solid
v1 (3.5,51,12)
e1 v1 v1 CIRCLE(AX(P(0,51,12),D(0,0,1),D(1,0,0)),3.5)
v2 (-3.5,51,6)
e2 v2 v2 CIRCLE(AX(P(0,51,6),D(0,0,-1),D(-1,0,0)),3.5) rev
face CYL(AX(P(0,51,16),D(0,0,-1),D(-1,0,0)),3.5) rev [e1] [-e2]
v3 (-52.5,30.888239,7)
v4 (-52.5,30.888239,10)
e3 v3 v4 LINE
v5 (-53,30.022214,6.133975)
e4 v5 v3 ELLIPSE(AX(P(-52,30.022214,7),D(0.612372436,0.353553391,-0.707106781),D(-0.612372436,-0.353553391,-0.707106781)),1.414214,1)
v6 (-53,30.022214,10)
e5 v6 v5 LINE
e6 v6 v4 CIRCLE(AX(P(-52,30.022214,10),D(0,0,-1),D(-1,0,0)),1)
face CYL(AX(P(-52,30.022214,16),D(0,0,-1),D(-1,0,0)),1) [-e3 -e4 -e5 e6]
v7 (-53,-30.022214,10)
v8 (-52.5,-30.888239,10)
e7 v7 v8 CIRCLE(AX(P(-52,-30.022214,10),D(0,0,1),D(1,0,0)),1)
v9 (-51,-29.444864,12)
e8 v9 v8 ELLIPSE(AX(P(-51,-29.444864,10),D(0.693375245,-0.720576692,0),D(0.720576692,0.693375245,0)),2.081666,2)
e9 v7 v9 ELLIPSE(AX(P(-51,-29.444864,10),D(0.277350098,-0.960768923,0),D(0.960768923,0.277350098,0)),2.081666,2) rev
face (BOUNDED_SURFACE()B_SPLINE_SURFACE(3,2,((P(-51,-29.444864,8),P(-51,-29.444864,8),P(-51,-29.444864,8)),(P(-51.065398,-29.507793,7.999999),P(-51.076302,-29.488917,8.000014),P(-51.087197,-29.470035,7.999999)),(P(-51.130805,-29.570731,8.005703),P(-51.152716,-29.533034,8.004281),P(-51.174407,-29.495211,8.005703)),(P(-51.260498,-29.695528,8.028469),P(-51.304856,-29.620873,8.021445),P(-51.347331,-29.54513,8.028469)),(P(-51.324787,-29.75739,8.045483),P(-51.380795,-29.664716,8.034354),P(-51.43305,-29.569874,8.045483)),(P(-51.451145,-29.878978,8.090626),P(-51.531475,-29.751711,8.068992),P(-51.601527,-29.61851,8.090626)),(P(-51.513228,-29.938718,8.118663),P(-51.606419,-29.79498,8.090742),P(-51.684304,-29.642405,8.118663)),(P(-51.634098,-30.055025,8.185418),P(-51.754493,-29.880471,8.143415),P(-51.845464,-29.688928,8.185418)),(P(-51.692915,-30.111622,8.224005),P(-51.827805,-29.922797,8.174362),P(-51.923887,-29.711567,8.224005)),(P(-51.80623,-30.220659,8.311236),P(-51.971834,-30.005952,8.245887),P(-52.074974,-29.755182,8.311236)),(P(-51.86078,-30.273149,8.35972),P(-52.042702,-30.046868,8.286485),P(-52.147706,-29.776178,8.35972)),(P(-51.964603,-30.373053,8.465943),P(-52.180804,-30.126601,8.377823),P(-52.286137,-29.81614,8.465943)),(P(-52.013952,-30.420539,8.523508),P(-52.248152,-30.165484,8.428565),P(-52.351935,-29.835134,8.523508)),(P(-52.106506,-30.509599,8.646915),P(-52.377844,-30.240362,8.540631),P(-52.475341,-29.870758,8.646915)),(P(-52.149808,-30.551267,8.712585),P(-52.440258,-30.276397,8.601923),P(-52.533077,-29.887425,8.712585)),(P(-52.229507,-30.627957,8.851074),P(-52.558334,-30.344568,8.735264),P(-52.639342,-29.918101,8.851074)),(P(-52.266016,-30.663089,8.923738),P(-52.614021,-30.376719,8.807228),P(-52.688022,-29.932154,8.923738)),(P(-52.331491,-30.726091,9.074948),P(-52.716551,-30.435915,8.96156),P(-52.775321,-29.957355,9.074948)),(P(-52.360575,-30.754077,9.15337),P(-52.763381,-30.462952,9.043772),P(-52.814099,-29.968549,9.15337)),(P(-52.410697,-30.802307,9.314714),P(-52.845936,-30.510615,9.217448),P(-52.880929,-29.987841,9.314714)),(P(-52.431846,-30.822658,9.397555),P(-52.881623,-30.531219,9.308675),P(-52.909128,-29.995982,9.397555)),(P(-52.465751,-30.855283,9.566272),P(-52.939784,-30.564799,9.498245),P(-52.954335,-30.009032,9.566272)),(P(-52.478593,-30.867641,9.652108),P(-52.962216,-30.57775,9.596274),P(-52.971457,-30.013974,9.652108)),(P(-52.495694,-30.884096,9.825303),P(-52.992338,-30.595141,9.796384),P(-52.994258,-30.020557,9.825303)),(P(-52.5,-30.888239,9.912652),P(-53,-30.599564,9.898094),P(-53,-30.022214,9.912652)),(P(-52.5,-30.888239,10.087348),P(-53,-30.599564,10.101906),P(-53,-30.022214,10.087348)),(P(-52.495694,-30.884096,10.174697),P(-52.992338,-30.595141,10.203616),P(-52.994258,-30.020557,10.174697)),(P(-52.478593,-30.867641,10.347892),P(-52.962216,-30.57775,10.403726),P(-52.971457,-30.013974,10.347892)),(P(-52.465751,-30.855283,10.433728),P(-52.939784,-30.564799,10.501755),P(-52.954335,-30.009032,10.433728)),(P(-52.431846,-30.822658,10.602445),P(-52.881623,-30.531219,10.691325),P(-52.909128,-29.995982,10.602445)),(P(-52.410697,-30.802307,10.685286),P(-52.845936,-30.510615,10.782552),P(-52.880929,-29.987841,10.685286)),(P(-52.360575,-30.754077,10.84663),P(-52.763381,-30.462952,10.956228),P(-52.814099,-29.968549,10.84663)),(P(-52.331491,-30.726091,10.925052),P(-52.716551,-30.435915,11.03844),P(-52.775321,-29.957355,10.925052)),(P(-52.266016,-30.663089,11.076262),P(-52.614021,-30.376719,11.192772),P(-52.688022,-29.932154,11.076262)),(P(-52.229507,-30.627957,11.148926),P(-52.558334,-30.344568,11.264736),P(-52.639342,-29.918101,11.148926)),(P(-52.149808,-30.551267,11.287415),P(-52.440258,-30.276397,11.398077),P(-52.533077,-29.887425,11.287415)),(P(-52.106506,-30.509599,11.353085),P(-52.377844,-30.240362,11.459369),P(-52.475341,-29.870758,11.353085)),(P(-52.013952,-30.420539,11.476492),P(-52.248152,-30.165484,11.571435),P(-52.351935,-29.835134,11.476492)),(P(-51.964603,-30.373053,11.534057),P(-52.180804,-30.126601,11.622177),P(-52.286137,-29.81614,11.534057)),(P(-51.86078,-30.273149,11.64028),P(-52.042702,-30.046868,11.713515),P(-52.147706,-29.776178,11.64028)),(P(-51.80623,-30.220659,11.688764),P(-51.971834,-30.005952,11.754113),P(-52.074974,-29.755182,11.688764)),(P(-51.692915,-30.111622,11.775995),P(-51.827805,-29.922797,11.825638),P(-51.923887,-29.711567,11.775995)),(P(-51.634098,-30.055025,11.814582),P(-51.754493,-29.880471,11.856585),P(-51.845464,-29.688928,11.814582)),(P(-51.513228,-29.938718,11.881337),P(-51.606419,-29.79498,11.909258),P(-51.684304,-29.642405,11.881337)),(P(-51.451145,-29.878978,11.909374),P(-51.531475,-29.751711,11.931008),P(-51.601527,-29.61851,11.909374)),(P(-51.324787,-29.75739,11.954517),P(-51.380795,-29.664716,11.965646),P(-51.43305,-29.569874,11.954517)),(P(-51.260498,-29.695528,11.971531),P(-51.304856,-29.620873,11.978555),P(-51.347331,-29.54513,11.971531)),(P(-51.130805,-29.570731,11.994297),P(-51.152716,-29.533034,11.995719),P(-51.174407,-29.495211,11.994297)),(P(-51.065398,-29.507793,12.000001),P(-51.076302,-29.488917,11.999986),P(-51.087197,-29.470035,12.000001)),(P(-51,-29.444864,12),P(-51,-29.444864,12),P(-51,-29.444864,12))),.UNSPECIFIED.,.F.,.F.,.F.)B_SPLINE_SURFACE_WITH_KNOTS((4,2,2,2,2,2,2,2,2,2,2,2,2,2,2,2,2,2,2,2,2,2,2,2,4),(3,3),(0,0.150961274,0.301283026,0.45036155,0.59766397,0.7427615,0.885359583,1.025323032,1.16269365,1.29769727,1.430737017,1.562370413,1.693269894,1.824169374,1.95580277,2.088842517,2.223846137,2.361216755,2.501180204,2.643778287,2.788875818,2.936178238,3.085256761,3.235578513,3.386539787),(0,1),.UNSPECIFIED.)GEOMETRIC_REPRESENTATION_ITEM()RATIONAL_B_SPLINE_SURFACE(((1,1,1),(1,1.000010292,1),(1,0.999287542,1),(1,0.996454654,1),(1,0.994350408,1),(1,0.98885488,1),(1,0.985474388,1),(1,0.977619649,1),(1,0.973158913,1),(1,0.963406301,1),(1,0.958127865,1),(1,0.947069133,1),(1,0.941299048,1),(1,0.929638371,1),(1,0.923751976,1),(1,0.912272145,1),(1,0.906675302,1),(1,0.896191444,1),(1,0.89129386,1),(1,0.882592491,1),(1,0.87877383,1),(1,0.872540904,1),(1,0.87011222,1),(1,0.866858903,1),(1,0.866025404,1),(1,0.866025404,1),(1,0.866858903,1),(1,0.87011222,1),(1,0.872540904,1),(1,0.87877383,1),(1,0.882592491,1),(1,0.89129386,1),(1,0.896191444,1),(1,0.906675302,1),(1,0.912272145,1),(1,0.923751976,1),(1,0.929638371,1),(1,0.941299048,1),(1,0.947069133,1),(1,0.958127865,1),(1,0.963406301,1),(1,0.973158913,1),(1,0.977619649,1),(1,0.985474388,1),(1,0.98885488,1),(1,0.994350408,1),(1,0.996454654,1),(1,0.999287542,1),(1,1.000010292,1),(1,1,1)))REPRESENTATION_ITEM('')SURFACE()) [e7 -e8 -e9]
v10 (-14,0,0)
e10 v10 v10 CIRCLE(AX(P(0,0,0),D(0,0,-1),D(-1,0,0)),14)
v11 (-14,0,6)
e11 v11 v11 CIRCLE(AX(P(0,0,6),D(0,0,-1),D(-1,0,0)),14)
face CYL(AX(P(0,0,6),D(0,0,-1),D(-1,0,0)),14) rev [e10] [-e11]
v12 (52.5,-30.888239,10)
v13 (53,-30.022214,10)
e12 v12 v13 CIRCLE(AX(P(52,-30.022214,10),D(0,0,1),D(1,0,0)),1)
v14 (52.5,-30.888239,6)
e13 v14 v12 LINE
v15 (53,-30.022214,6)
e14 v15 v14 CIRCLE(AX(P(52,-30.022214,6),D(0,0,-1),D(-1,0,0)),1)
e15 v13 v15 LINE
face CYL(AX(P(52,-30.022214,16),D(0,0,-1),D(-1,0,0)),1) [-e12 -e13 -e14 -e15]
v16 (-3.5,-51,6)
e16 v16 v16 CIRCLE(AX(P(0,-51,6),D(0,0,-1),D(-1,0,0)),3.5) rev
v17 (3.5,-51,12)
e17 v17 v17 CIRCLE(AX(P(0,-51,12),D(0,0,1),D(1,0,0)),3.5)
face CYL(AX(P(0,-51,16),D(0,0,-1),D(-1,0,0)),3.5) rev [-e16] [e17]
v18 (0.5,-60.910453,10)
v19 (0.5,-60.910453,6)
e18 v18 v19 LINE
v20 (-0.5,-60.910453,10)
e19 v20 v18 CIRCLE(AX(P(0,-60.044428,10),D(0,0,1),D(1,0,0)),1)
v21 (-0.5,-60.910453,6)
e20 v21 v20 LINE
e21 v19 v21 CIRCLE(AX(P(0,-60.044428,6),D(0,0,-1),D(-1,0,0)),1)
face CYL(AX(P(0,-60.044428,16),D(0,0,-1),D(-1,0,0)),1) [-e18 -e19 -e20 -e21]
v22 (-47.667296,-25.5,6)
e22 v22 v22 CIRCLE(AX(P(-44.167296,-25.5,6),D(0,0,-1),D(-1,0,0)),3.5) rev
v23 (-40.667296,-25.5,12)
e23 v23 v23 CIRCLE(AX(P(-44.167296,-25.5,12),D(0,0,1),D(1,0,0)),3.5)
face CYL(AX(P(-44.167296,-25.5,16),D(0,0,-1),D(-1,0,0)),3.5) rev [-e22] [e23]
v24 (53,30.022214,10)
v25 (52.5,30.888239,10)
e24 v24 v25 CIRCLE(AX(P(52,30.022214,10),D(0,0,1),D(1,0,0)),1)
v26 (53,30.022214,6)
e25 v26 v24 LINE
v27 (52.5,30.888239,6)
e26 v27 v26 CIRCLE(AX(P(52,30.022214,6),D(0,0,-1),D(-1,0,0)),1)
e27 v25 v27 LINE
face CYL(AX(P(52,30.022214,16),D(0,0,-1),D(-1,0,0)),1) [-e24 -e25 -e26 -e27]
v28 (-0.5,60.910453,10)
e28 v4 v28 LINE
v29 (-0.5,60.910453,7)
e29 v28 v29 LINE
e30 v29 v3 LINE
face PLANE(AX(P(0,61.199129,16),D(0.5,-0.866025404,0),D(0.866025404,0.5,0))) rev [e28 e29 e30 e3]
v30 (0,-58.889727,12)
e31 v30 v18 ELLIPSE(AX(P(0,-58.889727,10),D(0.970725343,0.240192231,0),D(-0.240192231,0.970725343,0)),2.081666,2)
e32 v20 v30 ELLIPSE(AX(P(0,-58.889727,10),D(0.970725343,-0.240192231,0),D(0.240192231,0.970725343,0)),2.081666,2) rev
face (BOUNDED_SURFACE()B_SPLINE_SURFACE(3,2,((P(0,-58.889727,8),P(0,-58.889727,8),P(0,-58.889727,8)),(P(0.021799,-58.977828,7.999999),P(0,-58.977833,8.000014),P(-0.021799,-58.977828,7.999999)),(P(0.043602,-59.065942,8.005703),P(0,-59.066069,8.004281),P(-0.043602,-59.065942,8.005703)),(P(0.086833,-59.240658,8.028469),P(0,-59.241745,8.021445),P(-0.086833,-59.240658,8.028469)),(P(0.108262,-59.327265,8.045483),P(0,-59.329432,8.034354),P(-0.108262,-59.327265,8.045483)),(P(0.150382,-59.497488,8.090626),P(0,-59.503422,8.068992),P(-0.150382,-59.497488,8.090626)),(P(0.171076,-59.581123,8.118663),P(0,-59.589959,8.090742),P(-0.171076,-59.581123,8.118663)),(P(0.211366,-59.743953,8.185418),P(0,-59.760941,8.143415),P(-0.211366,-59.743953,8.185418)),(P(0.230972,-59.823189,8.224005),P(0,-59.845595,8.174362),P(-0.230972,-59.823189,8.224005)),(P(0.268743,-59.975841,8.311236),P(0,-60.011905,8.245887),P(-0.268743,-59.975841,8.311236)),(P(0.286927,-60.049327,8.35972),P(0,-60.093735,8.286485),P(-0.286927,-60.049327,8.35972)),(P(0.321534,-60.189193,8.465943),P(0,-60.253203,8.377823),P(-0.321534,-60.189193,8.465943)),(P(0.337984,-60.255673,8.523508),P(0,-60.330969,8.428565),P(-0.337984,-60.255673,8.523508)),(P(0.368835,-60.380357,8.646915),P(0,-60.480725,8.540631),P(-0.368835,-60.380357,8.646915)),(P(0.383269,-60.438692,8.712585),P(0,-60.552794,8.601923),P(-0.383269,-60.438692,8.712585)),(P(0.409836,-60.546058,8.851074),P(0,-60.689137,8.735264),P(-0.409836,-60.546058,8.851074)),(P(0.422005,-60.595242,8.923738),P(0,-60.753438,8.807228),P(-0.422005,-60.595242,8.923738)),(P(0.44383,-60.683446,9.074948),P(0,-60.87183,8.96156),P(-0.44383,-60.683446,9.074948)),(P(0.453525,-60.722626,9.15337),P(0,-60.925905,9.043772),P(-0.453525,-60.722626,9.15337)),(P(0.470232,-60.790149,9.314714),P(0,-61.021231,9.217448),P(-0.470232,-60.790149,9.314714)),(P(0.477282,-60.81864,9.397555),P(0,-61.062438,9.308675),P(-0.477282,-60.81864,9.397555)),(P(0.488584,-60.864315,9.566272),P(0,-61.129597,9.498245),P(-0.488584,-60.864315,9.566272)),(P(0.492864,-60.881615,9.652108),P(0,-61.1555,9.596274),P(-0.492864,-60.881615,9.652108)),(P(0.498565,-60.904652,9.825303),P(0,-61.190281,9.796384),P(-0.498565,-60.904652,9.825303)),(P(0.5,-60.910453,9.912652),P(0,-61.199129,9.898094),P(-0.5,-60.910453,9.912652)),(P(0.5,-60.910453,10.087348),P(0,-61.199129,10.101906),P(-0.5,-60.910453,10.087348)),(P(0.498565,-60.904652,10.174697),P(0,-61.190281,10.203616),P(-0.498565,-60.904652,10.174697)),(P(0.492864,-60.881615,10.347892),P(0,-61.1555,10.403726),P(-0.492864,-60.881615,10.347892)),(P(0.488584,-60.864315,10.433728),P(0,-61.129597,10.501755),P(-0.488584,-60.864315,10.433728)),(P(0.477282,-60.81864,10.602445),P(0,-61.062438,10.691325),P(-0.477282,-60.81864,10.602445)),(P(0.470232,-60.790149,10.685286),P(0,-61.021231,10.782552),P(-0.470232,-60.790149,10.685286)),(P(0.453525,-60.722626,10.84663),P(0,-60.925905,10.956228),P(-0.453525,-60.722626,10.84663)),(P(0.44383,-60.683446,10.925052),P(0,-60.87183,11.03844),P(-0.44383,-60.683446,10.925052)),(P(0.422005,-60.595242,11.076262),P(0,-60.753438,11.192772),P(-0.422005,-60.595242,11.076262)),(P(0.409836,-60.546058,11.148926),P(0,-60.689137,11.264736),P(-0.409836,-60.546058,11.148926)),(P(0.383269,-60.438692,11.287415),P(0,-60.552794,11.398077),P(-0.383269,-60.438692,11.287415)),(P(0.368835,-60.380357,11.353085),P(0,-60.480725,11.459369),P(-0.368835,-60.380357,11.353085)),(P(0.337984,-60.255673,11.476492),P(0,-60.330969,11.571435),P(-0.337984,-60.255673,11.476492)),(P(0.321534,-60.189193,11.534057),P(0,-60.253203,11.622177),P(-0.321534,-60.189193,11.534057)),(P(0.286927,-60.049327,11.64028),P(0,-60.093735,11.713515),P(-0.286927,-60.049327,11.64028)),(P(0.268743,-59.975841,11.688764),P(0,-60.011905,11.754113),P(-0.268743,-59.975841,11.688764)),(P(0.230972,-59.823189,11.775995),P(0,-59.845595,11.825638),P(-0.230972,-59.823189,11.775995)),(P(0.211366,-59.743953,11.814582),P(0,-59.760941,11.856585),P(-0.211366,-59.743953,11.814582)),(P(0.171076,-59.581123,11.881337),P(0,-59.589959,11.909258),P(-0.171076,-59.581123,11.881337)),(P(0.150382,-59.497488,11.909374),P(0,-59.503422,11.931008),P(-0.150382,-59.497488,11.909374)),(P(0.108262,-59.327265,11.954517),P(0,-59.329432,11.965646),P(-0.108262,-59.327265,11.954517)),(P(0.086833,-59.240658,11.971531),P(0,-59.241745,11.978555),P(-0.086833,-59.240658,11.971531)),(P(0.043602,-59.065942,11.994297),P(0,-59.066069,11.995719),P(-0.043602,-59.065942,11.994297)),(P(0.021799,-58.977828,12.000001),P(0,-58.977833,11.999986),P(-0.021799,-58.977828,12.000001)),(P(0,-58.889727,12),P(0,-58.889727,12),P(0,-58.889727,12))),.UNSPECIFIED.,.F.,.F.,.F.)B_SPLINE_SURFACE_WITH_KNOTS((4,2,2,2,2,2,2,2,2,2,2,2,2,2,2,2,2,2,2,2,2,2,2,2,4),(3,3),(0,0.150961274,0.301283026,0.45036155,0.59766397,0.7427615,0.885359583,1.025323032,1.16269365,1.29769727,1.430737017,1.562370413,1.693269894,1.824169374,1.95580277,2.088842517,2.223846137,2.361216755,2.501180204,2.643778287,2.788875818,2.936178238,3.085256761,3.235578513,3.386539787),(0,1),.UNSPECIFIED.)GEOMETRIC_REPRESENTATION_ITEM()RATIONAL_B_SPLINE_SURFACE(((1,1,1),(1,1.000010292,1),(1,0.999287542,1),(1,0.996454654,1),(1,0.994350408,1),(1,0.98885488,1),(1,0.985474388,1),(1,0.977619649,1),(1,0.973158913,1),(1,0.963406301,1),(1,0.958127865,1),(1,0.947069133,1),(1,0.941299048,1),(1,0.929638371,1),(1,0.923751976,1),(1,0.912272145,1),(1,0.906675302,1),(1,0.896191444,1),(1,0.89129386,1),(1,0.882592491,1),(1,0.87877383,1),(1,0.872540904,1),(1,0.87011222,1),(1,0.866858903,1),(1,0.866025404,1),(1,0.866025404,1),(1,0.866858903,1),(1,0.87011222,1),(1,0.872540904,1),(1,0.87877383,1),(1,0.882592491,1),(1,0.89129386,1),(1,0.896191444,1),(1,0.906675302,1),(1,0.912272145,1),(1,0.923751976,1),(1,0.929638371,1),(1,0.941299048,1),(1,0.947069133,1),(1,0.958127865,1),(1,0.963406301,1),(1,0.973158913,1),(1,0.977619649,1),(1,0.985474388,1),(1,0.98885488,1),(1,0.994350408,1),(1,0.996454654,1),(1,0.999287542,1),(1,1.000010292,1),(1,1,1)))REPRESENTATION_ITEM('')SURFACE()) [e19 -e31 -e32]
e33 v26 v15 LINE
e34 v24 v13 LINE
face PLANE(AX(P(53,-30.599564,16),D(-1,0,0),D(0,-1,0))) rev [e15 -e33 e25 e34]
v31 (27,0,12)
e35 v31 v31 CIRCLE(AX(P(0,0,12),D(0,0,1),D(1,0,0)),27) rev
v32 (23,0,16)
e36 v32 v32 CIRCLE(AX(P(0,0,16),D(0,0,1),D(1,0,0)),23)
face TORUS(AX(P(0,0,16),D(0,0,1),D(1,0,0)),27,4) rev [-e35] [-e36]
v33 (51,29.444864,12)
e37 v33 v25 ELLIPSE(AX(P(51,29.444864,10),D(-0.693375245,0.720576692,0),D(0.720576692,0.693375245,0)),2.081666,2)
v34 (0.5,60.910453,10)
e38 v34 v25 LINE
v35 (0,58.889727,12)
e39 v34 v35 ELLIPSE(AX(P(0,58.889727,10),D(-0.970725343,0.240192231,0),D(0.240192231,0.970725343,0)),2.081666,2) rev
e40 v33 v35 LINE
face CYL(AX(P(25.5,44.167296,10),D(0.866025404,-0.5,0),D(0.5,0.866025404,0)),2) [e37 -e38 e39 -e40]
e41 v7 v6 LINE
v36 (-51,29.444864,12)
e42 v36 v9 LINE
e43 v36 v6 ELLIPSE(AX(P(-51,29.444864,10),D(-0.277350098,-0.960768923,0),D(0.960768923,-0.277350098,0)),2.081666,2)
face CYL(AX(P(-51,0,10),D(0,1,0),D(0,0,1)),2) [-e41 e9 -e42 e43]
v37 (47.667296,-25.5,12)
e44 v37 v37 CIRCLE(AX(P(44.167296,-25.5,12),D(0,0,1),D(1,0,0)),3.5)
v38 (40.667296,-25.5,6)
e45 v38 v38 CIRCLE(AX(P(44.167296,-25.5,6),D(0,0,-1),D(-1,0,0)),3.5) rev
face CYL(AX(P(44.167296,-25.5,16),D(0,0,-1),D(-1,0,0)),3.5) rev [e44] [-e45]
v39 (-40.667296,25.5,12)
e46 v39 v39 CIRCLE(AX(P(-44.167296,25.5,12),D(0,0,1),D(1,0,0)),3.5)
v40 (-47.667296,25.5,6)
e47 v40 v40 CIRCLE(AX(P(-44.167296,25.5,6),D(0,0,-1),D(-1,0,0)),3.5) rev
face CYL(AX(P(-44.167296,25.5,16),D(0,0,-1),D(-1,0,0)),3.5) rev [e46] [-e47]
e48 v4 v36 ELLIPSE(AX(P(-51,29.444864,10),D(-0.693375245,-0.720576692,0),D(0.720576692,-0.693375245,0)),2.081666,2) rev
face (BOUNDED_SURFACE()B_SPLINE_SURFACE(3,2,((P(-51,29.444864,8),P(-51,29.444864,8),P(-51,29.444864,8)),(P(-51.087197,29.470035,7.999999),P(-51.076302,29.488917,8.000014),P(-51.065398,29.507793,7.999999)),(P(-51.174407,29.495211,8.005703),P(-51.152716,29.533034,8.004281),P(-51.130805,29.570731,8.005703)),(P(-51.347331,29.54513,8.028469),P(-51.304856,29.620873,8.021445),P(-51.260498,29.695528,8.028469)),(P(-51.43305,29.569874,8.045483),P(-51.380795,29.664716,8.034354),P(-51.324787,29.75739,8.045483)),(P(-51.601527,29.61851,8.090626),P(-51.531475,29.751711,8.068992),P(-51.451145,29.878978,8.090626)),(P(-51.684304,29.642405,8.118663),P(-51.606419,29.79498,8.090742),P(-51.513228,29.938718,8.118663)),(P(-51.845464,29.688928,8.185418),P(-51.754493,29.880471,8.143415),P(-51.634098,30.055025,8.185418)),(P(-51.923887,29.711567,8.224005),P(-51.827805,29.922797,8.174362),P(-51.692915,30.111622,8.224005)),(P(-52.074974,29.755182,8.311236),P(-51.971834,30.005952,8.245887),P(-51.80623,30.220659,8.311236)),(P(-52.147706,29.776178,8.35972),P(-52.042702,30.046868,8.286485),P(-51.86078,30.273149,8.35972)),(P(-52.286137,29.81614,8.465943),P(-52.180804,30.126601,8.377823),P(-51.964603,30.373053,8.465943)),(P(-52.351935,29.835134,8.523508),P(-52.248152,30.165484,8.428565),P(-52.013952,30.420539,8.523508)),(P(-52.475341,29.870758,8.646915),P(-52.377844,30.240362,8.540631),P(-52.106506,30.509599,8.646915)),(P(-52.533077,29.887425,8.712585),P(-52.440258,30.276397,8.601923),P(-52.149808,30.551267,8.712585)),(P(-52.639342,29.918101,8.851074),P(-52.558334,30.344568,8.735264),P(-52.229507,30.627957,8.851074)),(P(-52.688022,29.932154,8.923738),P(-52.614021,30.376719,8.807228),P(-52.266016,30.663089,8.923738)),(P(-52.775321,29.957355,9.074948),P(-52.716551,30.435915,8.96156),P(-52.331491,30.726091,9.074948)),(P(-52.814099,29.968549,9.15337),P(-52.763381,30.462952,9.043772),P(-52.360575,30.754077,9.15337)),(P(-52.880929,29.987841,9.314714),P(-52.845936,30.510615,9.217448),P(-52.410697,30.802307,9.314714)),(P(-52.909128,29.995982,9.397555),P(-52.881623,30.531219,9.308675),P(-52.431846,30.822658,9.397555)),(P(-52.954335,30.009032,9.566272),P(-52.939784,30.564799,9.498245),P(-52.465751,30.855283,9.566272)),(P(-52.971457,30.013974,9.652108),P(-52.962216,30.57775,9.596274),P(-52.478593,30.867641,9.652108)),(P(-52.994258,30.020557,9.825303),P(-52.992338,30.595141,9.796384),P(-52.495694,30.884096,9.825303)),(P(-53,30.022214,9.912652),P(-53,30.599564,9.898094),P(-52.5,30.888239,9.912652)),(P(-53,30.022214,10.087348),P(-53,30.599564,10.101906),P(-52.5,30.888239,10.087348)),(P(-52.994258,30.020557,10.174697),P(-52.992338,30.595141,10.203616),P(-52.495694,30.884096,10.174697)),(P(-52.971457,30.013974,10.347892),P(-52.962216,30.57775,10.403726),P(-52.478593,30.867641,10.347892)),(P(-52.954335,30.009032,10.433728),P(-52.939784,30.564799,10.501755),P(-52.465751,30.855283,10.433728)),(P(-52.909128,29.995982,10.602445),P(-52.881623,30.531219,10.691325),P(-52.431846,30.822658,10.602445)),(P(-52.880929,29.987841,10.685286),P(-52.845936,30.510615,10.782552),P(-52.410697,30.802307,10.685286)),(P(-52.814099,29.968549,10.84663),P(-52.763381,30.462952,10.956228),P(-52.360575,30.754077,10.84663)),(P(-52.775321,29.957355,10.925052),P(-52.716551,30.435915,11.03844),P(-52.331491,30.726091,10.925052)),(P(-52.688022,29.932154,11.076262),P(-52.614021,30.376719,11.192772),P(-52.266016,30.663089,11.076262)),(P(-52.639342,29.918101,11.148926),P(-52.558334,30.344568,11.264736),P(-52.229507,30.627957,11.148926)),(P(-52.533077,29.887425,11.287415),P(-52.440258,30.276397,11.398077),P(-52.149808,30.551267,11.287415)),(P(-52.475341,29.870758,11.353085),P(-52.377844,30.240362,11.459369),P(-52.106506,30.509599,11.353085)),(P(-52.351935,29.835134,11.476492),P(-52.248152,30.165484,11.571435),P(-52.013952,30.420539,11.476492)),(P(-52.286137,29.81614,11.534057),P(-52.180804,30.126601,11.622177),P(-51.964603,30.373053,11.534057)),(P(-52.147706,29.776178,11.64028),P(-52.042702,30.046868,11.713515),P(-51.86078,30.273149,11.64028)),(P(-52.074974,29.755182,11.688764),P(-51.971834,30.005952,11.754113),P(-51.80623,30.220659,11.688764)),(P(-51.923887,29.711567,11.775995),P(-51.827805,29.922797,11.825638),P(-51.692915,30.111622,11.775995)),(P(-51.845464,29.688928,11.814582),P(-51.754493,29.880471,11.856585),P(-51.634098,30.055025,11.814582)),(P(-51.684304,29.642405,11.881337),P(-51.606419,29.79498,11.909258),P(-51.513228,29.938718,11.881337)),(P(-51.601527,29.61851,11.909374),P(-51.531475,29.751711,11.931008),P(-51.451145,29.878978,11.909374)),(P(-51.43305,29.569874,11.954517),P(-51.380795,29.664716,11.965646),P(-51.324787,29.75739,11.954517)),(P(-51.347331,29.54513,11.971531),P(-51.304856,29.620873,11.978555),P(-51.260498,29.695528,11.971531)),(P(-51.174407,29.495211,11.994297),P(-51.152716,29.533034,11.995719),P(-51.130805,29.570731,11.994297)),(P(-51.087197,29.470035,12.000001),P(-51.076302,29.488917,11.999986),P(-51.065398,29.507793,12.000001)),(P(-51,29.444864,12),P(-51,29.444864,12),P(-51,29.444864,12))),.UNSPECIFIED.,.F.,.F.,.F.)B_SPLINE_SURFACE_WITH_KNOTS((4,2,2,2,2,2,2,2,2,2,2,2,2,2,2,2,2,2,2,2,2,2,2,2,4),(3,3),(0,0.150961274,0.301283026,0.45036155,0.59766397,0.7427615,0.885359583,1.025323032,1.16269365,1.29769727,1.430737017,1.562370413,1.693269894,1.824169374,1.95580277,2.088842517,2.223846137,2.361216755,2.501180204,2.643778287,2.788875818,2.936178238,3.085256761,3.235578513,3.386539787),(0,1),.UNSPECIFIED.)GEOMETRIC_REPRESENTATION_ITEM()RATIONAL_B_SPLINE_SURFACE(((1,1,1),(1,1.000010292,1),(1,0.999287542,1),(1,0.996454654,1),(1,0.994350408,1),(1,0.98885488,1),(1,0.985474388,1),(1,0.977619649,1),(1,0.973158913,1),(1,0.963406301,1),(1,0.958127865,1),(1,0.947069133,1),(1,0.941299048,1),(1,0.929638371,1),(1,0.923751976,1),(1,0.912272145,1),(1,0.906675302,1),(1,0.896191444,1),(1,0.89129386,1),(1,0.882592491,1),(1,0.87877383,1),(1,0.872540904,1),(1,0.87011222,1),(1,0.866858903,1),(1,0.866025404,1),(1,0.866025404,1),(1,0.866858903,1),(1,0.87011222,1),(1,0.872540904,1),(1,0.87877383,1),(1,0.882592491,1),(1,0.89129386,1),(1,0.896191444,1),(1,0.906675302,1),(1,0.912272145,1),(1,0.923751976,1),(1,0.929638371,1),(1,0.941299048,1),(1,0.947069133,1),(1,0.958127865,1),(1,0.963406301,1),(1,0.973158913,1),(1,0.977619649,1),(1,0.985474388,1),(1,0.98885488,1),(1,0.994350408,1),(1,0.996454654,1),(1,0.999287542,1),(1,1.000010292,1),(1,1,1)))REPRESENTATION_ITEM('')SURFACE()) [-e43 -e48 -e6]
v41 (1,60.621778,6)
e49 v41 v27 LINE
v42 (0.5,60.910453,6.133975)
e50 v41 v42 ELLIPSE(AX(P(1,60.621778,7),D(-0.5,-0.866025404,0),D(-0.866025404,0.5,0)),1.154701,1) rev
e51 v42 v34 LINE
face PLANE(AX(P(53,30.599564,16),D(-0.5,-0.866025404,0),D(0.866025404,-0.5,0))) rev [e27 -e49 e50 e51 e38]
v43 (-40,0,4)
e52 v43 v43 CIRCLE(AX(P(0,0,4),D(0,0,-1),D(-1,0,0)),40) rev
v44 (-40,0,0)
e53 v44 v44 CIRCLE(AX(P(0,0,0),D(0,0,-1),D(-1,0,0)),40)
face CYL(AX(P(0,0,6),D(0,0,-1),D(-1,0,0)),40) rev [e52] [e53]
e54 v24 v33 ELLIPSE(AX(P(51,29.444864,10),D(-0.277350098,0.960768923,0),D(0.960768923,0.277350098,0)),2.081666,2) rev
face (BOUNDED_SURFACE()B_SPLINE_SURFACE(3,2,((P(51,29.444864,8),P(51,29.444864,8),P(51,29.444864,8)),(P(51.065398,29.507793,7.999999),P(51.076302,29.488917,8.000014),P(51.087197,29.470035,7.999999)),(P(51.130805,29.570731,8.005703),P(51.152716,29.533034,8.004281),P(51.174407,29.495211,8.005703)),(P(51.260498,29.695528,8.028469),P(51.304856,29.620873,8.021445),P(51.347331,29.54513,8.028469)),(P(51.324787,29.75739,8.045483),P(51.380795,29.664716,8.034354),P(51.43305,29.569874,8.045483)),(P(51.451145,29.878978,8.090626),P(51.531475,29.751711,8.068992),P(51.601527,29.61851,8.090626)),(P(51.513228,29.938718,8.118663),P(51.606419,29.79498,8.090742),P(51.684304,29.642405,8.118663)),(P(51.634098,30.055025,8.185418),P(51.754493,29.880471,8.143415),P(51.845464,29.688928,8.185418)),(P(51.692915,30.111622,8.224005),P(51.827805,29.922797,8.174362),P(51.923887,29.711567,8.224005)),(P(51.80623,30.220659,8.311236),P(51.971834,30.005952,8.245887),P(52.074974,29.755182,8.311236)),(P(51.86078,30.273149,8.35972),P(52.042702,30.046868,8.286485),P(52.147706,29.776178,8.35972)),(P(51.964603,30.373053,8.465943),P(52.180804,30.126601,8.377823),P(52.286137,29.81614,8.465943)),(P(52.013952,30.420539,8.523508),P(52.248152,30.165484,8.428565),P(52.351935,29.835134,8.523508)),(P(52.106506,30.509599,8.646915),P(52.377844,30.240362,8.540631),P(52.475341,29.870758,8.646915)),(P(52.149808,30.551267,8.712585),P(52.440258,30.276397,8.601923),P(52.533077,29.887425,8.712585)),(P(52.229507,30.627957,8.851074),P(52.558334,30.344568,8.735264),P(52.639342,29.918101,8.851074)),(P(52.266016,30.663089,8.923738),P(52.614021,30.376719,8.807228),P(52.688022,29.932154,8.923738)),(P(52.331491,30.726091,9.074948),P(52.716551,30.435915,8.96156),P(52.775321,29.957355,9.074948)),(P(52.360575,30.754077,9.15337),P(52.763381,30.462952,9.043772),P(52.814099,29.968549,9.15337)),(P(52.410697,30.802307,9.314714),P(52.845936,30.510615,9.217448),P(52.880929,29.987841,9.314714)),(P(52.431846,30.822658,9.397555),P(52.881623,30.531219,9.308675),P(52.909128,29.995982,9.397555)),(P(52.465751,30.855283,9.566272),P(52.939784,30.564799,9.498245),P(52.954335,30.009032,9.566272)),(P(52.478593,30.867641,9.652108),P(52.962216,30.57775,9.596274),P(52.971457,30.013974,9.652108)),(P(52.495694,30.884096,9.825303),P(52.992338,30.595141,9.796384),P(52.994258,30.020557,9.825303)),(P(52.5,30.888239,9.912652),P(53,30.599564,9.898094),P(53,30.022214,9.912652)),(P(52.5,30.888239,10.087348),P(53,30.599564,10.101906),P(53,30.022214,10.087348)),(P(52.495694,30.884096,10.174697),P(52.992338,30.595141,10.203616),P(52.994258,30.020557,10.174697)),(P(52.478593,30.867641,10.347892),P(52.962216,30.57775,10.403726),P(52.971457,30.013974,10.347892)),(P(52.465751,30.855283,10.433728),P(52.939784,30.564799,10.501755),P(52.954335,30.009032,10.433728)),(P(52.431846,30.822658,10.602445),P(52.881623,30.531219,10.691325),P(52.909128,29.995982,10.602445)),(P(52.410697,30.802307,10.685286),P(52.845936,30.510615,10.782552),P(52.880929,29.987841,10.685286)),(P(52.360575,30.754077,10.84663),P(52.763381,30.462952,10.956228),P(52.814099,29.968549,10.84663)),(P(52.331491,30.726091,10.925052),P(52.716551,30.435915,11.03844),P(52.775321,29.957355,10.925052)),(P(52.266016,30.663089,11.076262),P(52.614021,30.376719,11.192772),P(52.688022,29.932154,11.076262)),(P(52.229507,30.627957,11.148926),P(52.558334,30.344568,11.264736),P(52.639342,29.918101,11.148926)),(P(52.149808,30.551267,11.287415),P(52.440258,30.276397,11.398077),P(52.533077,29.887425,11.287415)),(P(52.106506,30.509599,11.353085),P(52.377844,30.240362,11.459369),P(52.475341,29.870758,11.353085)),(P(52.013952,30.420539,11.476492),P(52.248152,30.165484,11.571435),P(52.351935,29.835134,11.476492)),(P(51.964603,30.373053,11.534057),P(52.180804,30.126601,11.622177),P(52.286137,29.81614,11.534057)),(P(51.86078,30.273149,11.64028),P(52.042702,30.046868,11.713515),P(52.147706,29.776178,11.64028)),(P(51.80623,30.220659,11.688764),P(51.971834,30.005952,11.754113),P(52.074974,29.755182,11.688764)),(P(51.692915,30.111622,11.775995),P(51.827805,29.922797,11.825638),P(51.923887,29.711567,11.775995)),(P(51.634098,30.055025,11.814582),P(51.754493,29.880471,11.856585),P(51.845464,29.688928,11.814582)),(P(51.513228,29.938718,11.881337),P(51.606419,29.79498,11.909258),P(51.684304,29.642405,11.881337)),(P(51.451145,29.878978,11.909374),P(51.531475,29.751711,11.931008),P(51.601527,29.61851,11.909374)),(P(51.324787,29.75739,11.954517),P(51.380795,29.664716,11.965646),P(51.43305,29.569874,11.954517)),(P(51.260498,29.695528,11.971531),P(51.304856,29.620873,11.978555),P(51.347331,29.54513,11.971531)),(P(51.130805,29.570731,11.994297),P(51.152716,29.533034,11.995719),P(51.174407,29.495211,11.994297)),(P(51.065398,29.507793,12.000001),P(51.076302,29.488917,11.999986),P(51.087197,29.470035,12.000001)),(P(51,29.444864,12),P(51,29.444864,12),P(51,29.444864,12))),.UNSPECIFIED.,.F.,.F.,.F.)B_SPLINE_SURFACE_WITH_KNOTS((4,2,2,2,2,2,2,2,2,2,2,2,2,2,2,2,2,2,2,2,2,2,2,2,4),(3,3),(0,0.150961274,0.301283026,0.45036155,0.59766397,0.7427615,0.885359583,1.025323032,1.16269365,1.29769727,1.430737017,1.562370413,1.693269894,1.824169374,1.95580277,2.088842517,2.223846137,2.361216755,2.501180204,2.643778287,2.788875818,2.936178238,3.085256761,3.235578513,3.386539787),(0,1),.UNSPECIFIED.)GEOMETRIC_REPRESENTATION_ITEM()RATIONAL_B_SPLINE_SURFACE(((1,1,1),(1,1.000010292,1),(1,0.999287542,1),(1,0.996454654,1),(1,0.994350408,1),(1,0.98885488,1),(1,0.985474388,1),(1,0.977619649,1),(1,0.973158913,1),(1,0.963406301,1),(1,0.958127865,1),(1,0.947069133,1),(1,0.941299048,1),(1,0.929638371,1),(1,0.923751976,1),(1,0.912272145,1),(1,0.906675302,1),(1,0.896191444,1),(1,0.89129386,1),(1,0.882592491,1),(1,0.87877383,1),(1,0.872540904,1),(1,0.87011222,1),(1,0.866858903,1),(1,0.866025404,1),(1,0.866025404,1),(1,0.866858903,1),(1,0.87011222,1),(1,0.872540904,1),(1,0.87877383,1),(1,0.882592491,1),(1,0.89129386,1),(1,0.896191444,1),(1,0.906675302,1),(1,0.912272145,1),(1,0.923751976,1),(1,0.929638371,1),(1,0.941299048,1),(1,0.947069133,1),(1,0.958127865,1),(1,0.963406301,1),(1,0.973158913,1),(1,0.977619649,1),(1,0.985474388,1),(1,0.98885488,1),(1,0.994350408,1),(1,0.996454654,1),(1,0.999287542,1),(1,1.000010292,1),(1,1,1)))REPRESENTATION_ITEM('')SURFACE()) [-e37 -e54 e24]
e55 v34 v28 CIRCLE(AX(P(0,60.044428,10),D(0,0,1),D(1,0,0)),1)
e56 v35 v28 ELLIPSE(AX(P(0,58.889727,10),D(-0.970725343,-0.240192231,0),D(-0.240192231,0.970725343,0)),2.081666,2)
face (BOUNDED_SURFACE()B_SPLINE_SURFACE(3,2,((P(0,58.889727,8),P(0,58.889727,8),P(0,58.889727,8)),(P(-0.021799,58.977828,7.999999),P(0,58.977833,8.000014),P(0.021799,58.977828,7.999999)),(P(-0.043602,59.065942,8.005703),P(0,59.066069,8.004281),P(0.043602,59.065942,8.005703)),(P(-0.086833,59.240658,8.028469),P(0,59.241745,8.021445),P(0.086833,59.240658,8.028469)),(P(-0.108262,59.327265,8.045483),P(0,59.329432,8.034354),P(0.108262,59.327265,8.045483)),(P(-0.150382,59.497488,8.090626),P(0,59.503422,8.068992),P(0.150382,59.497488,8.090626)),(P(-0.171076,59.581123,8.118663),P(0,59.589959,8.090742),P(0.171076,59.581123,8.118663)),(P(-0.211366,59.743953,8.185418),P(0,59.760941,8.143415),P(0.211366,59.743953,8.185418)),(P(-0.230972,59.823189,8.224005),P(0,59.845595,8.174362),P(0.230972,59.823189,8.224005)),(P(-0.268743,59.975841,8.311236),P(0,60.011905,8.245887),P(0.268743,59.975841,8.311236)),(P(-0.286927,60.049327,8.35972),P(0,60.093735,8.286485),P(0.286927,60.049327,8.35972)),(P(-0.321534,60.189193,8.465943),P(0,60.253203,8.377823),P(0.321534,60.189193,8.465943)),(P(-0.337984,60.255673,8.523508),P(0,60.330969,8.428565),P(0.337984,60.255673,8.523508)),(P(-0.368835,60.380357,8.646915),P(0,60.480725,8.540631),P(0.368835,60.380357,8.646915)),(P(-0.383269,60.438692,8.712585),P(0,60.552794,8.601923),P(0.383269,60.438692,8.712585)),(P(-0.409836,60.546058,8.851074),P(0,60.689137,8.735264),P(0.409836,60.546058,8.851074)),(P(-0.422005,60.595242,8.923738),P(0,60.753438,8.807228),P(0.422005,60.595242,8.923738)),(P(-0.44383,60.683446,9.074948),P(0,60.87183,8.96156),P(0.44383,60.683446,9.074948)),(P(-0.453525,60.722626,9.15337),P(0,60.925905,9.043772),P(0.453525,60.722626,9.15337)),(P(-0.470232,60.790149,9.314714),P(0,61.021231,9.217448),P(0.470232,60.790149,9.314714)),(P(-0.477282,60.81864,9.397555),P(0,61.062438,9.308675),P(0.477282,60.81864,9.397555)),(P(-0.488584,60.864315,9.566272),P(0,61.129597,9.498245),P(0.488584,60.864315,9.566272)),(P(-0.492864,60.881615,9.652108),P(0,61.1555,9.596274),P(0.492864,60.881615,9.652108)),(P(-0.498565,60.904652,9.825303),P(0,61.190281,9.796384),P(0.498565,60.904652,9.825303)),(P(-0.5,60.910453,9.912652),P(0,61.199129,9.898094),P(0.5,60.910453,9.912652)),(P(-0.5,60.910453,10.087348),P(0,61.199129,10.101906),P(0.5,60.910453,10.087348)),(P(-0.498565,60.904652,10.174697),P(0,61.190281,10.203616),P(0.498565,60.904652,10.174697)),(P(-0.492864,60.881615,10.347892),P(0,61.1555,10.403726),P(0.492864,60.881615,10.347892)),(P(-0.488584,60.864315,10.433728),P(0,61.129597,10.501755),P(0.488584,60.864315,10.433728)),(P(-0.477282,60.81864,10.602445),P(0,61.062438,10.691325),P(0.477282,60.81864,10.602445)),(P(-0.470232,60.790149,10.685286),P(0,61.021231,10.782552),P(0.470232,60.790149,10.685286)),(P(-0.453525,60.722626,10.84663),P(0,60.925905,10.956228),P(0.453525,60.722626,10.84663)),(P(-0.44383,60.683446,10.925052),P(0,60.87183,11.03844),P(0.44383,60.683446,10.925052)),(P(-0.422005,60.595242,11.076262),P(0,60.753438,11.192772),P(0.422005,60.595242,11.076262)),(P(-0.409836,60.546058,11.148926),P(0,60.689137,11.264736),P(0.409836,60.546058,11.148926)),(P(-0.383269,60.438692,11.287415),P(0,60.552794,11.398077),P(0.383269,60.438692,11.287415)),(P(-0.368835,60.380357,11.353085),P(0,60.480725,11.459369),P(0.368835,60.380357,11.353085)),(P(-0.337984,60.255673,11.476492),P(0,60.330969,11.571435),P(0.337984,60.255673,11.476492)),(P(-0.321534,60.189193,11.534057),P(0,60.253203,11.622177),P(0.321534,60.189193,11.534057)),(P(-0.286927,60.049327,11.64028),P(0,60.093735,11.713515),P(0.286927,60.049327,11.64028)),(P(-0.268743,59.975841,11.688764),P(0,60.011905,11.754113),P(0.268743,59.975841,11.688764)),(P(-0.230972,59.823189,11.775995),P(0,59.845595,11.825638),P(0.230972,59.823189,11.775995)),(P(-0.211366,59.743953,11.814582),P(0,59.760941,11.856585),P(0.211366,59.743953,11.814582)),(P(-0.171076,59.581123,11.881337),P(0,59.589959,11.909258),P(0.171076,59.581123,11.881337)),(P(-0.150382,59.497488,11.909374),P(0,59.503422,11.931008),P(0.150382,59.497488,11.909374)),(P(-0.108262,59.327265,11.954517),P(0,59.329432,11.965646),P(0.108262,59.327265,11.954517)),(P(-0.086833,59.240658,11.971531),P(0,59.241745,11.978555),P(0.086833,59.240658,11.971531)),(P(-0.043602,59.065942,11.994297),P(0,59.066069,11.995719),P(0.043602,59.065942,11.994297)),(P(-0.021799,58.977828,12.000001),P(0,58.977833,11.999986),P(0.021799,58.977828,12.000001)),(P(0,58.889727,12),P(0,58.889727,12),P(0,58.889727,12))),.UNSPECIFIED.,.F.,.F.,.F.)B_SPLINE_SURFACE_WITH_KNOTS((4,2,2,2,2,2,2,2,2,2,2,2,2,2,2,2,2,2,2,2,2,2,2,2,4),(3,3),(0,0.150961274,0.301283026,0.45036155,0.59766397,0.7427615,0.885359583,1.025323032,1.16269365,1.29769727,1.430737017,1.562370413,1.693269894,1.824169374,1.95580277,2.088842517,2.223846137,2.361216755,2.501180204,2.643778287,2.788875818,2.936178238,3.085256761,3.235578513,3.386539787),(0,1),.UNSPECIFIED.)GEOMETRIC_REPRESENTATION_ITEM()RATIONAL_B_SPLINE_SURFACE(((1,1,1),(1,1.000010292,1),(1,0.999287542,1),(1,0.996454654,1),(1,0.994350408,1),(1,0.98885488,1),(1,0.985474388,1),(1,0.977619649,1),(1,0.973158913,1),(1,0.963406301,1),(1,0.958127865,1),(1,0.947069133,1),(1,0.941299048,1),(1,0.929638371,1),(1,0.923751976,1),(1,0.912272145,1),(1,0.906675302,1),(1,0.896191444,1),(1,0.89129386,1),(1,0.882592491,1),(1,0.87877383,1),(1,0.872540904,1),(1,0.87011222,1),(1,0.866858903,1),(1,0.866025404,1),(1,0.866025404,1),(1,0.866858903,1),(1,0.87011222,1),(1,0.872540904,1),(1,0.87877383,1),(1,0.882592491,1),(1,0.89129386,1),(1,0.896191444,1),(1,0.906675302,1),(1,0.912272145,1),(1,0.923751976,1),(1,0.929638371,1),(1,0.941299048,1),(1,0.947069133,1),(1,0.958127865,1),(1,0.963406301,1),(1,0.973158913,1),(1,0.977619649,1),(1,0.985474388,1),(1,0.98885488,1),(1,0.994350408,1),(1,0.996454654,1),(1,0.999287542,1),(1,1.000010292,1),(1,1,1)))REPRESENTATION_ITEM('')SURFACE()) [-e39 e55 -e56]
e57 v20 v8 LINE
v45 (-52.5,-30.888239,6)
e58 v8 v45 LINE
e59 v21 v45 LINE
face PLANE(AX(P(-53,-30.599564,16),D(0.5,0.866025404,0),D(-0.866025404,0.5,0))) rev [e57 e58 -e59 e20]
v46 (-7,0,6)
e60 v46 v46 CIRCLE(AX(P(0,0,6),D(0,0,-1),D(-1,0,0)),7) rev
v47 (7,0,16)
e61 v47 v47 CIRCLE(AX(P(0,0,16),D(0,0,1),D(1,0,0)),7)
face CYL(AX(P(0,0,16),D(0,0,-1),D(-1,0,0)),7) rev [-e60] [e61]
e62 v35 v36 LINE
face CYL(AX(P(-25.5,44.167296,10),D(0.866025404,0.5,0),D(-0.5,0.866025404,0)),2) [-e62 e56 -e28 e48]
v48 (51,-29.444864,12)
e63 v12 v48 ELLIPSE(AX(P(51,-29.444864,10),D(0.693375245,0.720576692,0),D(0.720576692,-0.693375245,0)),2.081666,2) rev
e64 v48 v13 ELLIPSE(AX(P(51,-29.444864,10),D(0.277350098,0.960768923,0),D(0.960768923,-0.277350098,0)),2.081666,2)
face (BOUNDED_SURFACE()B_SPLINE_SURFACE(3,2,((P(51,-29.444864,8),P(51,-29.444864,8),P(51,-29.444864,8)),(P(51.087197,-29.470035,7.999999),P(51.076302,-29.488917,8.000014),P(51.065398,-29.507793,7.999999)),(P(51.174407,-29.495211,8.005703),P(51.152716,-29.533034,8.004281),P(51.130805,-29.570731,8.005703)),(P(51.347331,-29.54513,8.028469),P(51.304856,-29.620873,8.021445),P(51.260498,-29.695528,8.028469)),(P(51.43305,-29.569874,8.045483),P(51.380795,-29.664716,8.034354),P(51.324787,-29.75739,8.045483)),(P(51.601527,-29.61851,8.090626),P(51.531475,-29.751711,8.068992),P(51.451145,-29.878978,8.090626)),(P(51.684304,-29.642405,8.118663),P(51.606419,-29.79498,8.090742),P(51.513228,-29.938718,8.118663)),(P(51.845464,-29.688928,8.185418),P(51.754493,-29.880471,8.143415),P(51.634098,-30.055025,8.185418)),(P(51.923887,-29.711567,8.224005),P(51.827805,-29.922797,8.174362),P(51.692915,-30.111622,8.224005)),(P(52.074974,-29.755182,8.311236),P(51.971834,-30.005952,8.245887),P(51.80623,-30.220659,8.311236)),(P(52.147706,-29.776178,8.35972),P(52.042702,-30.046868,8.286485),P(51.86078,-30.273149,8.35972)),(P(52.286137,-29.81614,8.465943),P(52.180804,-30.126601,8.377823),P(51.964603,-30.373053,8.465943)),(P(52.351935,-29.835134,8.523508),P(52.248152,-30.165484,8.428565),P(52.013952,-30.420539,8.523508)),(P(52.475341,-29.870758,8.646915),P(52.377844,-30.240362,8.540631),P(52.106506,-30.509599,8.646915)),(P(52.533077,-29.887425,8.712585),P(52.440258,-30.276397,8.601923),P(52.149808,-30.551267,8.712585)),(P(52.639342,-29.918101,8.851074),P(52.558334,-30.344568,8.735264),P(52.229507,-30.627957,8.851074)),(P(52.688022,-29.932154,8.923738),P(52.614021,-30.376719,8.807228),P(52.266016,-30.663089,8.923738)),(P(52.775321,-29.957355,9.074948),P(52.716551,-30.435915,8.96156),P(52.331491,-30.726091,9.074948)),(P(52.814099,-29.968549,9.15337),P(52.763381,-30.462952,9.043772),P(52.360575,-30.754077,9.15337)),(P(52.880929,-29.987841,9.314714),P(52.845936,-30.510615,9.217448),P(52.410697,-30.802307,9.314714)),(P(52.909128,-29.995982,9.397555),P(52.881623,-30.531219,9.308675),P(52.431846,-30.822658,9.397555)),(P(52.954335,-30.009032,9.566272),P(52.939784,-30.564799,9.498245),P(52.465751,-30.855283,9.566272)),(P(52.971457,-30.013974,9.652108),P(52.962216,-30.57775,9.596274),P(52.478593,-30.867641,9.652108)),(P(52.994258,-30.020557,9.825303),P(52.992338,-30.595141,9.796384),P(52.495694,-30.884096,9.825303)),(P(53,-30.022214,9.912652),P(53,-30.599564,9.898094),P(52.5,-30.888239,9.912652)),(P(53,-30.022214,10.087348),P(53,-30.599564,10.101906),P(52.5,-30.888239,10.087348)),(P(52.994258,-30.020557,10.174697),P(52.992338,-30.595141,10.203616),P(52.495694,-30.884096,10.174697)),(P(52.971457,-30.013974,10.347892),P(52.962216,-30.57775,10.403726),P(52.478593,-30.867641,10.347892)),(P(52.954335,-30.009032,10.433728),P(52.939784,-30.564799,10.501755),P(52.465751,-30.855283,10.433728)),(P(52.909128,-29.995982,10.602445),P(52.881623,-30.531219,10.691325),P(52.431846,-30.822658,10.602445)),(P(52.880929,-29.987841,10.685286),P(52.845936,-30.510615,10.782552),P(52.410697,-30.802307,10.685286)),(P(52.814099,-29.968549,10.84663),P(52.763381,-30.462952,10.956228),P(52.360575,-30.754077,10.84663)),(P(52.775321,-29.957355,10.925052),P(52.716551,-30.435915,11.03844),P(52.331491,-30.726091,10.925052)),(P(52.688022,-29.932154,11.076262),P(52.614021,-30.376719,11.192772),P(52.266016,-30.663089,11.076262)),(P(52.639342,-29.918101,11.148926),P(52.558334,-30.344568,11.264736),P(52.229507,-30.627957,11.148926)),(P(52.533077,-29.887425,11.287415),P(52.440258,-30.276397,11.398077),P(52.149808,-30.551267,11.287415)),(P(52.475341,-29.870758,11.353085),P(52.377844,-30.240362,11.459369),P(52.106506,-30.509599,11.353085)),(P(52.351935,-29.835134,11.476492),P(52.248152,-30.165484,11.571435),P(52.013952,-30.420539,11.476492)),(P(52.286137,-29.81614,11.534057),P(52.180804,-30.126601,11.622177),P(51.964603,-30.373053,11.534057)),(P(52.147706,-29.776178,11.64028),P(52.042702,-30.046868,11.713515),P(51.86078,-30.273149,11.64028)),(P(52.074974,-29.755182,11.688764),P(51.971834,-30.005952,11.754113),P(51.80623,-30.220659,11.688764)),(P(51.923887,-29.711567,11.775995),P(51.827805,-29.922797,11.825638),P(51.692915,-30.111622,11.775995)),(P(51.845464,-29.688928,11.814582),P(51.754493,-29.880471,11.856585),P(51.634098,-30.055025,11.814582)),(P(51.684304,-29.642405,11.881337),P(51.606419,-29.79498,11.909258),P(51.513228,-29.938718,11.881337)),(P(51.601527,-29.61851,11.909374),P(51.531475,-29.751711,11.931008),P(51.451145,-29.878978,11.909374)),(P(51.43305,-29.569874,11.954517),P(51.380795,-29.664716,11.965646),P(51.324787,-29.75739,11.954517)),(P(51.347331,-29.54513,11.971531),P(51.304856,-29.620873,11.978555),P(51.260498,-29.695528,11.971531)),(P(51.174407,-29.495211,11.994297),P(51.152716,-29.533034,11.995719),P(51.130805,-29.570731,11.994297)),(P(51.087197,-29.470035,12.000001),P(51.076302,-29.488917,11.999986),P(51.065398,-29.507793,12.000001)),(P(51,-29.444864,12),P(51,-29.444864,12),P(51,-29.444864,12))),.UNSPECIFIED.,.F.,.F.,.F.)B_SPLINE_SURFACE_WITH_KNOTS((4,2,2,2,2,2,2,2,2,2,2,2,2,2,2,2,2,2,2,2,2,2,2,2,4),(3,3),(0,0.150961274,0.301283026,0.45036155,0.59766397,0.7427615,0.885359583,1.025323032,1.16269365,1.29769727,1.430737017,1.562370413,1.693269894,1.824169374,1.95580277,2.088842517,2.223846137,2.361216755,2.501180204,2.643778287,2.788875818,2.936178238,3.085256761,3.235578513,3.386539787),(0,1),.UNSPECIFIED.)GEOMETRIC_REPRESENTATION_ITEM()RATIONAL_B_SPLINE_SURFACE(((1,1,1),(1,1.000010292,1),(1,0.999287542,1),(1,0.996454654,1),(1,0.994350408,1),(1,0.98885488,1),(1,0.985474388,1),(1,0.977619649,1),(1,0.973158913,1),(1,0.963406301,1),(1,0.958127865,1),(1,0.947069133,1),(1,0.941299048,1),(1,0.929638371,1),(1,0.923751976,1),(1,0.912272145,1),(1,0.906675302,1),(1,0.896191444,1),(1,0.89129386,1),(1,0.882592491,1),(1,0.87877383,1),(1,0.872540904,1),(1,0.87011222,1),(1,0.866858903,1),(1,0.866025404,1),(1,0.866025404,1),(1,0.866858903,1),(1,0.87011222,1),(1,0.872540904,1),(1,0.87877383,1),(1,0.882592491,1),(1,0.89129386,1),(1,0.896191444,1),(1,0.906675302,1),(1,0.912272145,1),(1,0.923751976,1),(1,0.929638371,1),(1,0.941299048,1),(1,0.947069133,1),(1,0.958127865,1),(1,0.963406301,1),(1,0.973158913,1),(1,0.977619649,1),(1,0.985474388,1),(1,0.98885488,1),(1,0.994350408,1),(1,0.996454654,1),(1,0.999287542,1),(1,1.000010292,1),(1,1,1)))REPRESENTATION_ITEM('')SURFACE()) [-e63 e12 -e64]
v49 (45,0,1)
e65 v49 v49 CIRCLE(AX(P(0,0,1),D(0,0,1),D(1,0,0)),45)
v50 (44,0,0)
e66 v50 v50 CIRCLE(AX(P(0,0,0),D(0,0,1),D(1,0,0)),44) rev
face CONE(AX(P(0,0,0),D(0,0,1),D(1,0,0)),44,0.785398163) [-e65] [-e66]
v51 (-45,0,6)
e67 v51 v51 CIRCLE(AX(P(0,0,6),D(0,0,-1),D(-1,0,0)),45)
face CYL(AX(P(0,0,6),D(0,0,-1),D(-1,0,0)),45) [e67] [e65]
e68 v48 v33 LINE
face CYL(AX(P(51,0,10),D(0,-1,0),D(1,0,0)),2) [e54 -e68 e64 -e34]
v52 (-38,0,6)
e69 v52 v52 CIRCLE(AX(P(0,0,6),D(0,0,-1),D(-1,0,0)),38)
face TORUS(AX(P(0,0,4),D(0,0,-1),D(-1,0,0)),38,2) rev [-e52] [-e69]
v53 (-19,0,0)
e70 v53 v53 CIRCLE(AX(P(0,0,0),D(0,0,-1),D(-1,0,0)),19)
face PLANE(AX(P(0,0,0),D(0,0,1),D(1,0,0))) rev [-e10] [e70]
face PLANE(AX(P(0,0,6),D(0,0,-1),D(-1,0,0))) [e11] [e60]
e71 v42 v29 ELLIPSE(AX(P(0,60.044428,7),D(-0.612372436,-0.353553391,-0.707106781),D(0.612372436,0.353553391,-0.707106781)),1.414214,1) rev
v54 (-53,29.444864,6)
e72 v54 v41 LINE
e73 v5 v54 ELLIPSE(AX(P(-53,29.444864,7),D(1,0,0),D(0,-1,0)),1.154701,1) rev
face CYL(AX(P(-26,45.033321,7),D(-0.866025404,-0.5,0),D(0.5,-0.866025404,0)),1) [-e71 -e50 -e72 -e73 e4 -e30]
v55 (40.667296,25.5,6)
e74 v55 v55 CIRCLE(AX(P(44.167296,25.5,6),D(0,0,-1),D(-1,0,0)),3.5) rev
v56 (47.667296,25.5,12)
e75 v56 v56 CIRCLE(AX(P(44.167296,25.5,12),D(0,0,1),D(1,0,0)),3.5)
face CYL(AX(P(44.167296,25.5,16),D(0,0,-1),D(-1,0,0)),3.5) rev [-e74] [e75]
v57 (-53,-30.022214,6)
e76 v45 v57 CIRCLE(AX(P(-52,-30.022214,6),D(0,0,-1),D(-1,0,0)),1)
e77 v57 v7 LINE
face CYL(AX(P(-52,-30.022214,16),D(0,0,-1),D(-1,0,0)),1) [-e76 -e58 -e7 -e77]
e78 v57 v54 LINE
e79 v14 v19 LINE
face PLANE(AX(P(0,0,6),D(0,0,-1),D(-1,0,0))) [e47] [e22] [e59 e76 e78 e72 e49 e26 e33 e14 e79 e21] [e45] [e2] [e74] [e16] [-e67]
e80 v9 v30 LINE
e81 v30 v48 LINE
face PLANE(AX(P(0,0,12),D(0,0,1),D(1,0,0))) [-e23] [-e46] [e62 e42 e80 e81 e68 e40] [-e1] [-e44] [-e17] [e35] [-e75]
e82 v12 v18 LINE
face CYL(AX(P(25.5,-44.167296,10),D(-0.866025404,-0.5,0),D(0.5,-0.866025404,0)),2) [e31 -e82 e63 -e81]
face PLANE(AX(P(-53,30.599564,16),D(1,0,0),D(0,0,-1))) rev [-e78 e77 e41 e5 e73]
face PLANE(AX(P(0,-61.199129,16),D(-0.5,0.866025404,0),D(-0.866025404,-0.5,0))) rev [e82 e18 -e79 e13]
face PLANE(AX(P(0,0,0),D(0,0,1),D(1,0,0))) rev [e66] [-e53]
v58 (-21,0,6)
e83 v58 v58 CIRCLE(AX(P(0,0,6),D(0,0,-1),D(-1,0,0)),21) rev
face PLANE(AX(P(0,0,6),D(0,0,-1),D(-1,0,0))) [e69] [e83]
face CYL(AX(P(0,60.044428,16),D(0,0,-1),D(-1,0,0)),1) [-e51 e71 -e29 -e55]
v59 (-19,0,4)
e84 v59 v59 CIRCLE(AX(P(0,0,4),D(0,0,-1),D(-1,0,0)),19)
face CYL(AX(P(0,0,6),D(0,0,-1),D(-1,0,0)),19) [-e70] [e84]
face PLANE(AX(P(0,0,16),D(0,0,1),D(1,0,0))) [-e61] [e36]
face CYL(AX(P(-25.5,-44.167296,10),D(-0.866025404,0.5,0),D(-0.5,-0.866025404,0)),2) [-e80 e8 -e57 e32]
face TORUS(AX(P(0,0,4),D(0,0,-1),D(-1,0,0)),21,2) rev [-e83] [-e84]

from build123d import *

# Parameters (mm, degrees)
SKETCH1_R           = 3.5
SKETCH1_R_2         = 7
BOSS_EXTRUDE1_DEPTH = 16
SKETCH3_R           = 23
CUT_EXTRUDE1_DEPTH  = 4
SKETCH4_R           = 45
SKETCH4_R_2         = 3.5
SKETCH4_R_3         = 40
SKETCH4_R_4         = 19
SKETCH4_R_5         = 14
SKETCH4_R_6         = 7
CUT_EXTRUDE2_DEPTH  = 6
FILLET1_R           = 4
FILLET2_R           = 2
CHAMFER1_SIZE       = 1
FILLET4_R           = 1


with BuildPart() as part:
    # Sketch1 → Boss-Extrude1 (new body)
    with BuildSketch(Plane.XY):
        Polygon((-53, -30.599564267), (0, -61.199128534), (53, -30.599564267), (53, 30.599564267), (0, 61.199128534), (-53, 30.599564267), align=None)
        with Locations((0, 51)):
            Circle(SKETCH1_R, mode=Mode.SUBTRACT)
        with Locations((44.167295593, 25.5)):
            Circle(SKETCH1_R, mode=Mode.SUBTRACT)
        with Locations((44.167295593, -25.5)):
            Circle(SKETCH1_R, mode=Mode.SUBTRACT)
        with Locations((0, -51)):
            Circle(SKETCH1_R, mode=Mode.SUBTRACT)
        with Locations((-44.167295593, -25.5)):
            Circle(SKETCH1_R, mode=Mode.SUBTRACT)
        with Locations((-44.167295593, 25.5)):
            Circle(SKETCH1_R, mode=Mode.SUBTRACT)
        Circle(SKETCH1_R_2, mode=Mode.SUBTRACT)
    extrude(amount=BOSS_EXTRUDE1_DEPTH)

    # Sketch3 → Cut-Extrude1 (cut)
    with BuildSketch(Plane.XY.offset(16)):
        Polygon((-53, 30.599564267), (-53, -30.599564267), (0, -61.199128534), (53, -30.599564267), (53, 30.599564267), (0, 61.199128534), align=None)
        Circle(SKETCH3_R, mode=Mode.SUBTRACT)
    extrude(amount=-CUT_EXTRUDE1_DEPTH, mode=Mode.SUBTRACT)

    # Sketch4 → Cut-Extrude2 (cut)
    # profile 1 of 3: a face of its own
    with BuildSketch(Plane(origin=(0, 0, 0), x_dir=(-1, 0, 0), z_dir=(0, 0, -1))):
        Polygon((0, -61.199128534), (53, -30.599564267), (53, 30.599564267), (0, 61.199128534), (-53, 30.599564267), (-53, -30.599564267), align=None)
        Circle(SKETCH4_R, mode=Mode.SUBTRACT)
        with Locations((0, 51)):
            Circle(SKETCH4_R_2, mode=Mode.SUBTRACT)
        with Locations((-44.167295593, 25.5)):
            Circle(SKETCH4_R_2, mode=Mode.SUBTRACT)
        with Locations((0, -51)):
            Circle(SKETCH4_R_2, mode=Mode.SUBTRACT)
        with Locations((44.167295593, 25.5)):
            Circle(SKETCH4_R_2, mode=Mode.SUBTRACT)
        with Locations((44.167295593, -25.5)):
            Circle(SKETCH4_R_2, mode=Mode.SUBTRACT)
        with Locations((-44.167295593, -25.5)):
            Circle(SKETCH4_R_2, mode=Mode.SUBTRACT)
    # profile 2 of 3: a face of its own
    with BuildSketch(Plane(origin=(0, 0, 0), x_dir=(-1, 0, 0), z_dir=(0, 0, -1))):
        Circle(SKETCH4_R_3)
        Circle(SKETCH4_R_4, mode=Mode.SUBTRACT)
    # profile 3 of 3: a face of its own
    with BuildSketch(Plane(origin=(0, 0, 0), x_dir=(-1, 0, 0), z_dir=(0, 0, -1))):
        Circle(SKETCH4_R_5)
        Circle(SKETCH4_R_6, mode=Mode.SUBTRACT)
    extrude(amount=-CUT_EXTRUDE2_DEPTH, mode=Mode.SUBTRACT)

    # Fillet1
    fillet1_edges = [part.edges().sort_by_distance(p)[0] for p in [
        (-23, 0, 12),
    ]]
    fillet(fillet1_edges, radius=FILLET1_R - 0.0001)  # a hair under: the kernel refuses the full size

    # Fillet2
    fillet2_edges = [part.edges().sort_by_distance(p)[0] for p in [
        (19, 0, 6),
        (-26.5, 45.899346401, 12),
        (26.5, 45.899346401, 12),
        (53, 0, 12),
        (26.5, -45.899346401, 12),
        (-26.5, -45.899346401, 12),
        (-53, 0, 12),
        (40, 0, 6),
    ]]
    fillet(fillet2_edges, radius=FILLET2_R)

    # Chamfer1
    chamfer1_edges = [part.edges().sort_by_distance(p)[0] for p in [
        (45, 0, 0),
    ]]
    chamfer(chamfer1_edges, length=CHAMFER1_SIZE)

    # Fillet4
    fillet4_edges = [part.edges().sort_by_distance(p)[0] for p in [
        (-26.5, 45.899346401, 6),
        (-53, 30.599564267, 8),
        (0, 61.199128534, 8),
        (-53, -30.599564267, 8),
        (0, -61.199128534, 8),
        (53, -30.599564267, 8),
        (53, 30.599564267, 8),
        (52.362858156, -30.231710252, 11.463768304),
        (0, -60.463420503, 11.463768304),
        (52.362858156, 30.231710252, 11.463768304),
        (-52.362858156, -30.231710252, 11.463768304),
        (0, 60.463420503, 11.463768304),
        (-52.362858156, 30.231710252, 11.463768304),
    ]]
    fillet(fillet4_edges, radius=FILLET4_R)


solid = part.part
